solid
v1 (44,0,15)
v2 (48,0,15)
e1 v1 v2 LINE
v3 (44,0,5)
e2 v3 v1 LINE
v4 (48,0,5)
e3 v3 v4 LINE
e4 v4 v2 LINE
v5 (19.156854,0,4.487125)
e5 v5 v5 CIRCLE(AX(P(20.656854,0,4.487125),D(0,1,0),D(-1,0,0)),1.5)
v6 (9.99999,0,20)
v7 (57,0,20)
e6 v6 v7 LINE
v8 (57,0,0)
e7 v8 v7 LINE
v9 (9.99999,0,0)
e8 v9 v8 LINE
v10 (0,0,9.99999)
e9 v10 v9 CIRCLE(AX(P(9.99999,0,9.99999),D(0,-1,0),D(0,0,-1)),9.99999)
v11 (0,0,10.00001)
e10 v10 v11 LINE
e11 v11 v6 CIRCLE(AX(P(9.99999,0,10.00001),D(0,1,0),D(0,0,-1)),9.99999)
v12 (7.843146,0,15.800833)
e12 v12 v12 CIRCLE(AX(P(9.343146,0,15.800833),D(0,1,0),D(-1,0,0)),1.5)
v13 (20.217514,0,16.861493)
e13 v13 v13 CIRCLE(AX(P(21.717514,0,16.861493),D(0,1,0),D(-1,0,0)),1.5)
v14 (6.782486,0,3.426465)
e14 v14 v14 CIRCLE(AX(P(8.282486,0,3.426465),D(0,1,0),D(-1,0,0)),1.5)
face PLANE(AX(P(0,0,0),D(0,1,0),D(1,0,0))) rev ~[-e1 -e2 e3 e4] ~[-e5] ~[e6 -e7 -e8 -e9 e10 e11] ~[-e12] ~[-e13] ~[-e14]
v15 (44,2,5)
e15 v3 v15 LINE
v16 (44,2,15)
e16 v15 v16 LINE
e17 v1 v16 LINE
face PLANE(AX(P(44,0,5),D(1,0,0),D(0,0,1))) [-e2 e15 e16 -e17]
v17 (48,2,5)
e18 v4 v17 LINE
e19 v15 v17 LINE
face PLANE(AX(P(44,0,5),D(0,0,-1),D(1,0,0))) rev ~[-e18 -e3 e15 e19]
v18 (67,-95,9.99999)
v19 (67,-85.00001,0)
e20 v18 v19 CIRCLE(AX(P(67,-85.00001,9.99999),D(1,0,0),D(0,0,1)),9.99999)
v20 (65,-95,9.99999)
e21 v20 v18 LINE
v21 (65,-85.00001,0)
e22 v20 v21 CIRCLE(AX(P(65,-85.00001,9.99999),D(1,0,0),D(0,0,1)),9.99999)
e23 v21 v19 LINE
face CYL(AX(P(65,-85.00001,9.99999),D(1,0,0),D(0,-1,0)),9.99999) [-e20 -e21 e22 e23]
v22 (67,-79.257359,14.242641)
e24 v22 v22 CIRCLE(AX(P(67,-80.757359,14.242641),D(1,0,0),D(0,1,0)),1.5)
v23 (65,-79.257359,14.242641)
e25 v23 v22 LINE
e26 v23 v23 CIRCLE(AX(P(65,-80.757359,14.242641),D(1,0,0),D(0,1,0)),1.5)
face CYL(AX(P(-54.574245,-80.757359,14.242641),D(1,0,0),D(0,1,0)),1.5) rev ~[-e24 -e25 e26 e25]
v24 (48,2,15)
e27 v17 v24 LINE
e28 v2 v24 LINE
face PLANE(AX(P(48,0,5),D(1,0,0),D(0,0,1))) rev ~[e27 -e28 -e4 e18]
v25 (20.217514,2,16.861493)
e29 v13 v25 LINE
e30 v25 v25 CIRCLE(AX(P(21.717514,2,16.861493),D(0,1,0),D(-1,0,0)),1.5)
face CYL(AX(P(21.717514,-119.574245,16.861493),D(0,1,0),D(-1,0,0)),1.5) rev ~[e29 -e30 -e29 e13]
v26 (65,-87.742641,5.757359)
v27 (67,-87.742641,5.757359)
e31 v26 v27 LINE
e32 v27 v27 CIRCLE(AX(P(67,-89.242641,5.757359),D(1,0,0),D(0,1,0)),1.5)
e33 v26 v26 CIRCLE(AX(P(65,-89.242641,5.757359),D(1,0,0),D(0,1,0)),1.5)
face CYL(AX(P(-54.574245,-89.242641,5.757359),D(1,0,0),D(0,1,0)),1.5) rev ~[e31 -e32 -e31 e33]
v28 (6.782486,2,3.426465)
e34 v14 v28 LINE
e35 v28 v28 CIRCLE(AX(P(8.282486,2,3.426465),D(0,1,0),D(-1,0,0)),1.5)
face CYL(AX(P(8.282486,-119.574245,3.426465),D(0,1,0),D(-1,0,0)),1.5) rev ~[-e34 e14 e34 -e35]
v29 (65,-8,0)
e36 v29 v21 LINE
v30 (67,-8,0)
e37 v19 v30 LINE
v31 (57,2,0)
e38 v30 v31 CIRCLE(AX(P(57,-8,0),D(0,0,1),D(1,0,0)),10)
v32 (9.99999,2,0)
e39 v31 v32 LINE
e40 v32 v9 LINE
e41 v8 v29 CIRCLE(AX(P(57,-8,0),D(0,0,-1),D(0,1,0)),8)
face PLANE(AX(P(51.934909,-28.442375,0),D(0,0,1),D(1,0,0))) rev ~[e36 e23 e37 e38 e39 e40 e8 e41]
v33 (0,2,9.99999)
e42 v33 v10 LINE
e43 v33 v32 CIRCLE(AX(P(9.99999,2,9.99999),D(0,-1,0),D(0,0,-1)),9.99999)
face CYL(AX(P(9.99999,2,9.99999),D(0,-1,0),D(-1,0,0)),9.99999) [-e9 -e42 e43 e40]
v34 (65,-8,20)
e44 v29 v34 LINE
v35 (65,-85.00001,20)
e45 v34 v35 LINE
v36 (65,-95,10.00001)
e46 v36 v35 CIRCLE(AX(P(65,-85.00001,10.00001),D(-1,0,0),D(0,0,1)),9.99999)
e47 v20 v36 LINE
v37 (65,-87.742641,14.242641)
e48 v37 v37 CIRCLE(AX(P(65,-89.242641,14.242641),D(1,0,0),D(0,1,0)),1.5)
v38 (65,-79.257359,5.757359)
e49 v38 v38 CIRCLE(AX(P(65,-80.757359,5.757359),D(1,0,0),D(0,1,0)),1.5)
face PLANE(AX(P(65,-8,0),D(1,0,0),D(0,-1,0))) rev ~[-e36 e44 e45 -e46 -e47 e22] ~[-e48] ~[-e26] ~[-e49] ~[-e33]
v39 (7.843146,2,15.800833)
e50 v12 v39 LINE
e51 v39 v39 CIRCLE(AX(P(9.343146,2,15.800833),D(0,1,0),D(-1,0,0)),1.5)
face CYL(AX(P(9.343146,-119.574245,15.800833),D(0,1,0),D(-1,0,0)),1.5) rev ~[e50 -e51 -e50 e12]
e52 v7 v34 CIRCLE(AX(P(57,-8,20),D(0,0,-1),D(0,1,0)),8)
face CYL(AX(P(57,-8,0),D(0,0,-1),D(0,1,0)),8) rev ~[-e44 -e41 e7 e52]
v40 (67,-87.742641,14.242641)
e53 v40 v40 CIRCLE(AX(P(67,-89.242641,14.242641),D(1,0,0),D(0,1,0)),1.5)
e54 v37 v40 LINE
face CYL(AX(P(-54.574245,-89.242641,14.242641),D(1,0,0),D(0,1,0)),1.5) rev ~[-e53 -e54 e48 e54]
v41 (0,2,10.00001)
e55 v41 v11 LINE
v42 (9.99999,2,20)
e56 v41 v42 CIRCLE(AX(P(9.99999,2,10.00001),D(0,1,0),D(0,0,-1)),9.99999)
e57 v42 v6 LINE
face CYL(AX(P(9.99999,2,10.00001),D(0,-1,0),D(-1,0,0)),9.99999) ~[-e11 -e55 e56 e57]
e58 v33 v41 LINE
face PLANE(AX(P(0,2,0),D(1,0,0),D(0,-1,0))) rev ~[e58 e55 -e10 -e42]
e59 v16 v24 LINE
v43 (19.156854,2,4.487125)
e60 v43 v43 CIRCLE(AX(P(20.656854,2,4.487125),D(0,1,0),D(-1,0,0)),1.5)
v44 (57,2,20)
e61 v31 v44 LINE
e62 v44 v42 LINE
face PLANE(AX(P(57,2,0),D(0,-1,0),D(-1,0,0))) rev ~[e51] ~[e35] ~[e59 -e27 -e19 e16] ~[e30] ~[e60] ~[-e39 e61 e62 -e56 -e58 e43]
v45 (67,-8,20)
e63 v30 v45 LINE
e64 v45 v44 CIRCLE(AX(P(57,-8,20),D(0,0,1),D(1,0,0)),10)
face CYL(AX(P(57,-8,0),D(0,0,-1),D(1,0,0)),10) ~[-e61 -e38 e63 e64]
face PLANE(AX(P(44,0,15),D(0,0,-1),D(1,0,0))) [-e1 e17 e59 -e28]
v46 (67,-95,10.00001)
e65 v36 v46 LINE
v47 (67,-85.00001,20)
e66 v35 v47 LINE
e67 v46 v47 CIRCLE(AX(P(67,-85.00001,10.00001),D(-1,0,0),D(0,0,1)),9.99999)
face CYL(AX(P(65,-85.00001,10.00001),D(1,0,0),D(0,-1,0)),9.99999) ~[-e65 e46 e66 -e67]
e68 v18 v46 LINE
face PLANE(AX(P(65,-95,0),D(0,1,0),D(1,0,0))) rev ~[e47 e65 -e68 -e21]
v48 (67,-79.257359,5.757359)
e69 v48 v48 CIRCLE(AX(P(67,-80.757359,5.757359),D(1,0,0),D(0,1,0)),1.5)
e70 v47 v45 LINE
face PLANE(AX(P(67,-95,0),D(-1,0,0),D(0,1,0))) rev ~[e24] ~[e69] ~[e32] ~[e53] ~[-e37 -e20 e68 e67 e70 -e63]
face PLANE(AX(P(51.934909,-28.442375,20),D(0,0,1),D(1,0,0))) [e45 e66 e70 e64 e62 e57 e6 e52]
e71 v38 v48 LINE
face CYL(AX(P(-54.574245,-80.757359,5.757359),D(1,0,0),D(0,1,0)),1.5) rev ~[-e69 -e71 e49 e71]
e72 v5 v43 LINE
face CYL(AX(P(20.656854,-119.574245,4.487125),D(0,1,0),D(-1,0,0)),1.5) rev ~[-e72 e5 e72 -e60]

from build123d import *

# Parameters (mm, degrees)
F1_DEPTH = 20
F4_R     = 9.99999
F6_D     = 3
F2_W     = 4
F2_H     = 10
F7_DEPTH = 25
F8_D     = 3


# Not quite as in the source:
# - a fillet or chamfer is up to 0.001 mm smaller than in the source, because OpenCascade refuses the exact size
# - a feature names something its author has since deleted; it is built from what else it names


with BuildPart() as f1:
    # F0 (on Top) → F1 (new body)
    with BuildSketch(Plane.XY):
        with BuildLine():
            Line((0, 2), (0, 0))
            Line((0, 0), (57, 0))
            ThreePointArc((57, 0), (62.6568542495, -2.3431457505), (65, -8))
            Line((65, -8), (65, -95))
            Line((65, -95), (67, -95))
            Line((67, -95), (67, -8))
            ThreePointArc((67, -8), (64.0710678119, -0.9289321881), (57, 2))
            Line((57, 2), (0, 2))
        make_face()
    extrude(amount=F1_DEPTH)

    # F4 (radius 10 in the source; OpenCascade refuses exactly that, so slightly less here)
    f4_edges = [f1.edges().sort_by_distance(p)[0] for p in [
        (0, 1, 20),
        (0, 1, 0),
        (66, -95, 20),
        (66, -95, 0),
    ]]
    fillet(f4_edges, radius=F4_R)

    # F6 (through all)
    with Locations(Plane(origin=(65, 0, 0), x_dir=(0, -1, 0), z_dir=(-1, 0, 0))):
        with Locations((80.7573593129, 14.2426406871), (80.7573593129, 5.7573593129), (89.2426406871, 5.7573593129), (89.2426406871, 14.2426406871)):
            Hole(F6_D / 2)

    # F2 (on face) → F7 (cut)
    with BuildSketch(Plane.XZ):
        with Locations((46, 10)):
            Rectangle(F2_W, F2_H)
    extrude(amount=-F7_DEPTH, mode=Mode.SUBTRACT)

    # F8 (through all)
    with Locations(Plane.XZ):
        with Locations((8.2824855787, 3.4264645687), (21.7175144213, 16.8614934112), (20.6568542495, 4.4871247404), (9.3431457505, 15.8008332394)):
            Hole(F8_D / 2)


solid = f1.part
